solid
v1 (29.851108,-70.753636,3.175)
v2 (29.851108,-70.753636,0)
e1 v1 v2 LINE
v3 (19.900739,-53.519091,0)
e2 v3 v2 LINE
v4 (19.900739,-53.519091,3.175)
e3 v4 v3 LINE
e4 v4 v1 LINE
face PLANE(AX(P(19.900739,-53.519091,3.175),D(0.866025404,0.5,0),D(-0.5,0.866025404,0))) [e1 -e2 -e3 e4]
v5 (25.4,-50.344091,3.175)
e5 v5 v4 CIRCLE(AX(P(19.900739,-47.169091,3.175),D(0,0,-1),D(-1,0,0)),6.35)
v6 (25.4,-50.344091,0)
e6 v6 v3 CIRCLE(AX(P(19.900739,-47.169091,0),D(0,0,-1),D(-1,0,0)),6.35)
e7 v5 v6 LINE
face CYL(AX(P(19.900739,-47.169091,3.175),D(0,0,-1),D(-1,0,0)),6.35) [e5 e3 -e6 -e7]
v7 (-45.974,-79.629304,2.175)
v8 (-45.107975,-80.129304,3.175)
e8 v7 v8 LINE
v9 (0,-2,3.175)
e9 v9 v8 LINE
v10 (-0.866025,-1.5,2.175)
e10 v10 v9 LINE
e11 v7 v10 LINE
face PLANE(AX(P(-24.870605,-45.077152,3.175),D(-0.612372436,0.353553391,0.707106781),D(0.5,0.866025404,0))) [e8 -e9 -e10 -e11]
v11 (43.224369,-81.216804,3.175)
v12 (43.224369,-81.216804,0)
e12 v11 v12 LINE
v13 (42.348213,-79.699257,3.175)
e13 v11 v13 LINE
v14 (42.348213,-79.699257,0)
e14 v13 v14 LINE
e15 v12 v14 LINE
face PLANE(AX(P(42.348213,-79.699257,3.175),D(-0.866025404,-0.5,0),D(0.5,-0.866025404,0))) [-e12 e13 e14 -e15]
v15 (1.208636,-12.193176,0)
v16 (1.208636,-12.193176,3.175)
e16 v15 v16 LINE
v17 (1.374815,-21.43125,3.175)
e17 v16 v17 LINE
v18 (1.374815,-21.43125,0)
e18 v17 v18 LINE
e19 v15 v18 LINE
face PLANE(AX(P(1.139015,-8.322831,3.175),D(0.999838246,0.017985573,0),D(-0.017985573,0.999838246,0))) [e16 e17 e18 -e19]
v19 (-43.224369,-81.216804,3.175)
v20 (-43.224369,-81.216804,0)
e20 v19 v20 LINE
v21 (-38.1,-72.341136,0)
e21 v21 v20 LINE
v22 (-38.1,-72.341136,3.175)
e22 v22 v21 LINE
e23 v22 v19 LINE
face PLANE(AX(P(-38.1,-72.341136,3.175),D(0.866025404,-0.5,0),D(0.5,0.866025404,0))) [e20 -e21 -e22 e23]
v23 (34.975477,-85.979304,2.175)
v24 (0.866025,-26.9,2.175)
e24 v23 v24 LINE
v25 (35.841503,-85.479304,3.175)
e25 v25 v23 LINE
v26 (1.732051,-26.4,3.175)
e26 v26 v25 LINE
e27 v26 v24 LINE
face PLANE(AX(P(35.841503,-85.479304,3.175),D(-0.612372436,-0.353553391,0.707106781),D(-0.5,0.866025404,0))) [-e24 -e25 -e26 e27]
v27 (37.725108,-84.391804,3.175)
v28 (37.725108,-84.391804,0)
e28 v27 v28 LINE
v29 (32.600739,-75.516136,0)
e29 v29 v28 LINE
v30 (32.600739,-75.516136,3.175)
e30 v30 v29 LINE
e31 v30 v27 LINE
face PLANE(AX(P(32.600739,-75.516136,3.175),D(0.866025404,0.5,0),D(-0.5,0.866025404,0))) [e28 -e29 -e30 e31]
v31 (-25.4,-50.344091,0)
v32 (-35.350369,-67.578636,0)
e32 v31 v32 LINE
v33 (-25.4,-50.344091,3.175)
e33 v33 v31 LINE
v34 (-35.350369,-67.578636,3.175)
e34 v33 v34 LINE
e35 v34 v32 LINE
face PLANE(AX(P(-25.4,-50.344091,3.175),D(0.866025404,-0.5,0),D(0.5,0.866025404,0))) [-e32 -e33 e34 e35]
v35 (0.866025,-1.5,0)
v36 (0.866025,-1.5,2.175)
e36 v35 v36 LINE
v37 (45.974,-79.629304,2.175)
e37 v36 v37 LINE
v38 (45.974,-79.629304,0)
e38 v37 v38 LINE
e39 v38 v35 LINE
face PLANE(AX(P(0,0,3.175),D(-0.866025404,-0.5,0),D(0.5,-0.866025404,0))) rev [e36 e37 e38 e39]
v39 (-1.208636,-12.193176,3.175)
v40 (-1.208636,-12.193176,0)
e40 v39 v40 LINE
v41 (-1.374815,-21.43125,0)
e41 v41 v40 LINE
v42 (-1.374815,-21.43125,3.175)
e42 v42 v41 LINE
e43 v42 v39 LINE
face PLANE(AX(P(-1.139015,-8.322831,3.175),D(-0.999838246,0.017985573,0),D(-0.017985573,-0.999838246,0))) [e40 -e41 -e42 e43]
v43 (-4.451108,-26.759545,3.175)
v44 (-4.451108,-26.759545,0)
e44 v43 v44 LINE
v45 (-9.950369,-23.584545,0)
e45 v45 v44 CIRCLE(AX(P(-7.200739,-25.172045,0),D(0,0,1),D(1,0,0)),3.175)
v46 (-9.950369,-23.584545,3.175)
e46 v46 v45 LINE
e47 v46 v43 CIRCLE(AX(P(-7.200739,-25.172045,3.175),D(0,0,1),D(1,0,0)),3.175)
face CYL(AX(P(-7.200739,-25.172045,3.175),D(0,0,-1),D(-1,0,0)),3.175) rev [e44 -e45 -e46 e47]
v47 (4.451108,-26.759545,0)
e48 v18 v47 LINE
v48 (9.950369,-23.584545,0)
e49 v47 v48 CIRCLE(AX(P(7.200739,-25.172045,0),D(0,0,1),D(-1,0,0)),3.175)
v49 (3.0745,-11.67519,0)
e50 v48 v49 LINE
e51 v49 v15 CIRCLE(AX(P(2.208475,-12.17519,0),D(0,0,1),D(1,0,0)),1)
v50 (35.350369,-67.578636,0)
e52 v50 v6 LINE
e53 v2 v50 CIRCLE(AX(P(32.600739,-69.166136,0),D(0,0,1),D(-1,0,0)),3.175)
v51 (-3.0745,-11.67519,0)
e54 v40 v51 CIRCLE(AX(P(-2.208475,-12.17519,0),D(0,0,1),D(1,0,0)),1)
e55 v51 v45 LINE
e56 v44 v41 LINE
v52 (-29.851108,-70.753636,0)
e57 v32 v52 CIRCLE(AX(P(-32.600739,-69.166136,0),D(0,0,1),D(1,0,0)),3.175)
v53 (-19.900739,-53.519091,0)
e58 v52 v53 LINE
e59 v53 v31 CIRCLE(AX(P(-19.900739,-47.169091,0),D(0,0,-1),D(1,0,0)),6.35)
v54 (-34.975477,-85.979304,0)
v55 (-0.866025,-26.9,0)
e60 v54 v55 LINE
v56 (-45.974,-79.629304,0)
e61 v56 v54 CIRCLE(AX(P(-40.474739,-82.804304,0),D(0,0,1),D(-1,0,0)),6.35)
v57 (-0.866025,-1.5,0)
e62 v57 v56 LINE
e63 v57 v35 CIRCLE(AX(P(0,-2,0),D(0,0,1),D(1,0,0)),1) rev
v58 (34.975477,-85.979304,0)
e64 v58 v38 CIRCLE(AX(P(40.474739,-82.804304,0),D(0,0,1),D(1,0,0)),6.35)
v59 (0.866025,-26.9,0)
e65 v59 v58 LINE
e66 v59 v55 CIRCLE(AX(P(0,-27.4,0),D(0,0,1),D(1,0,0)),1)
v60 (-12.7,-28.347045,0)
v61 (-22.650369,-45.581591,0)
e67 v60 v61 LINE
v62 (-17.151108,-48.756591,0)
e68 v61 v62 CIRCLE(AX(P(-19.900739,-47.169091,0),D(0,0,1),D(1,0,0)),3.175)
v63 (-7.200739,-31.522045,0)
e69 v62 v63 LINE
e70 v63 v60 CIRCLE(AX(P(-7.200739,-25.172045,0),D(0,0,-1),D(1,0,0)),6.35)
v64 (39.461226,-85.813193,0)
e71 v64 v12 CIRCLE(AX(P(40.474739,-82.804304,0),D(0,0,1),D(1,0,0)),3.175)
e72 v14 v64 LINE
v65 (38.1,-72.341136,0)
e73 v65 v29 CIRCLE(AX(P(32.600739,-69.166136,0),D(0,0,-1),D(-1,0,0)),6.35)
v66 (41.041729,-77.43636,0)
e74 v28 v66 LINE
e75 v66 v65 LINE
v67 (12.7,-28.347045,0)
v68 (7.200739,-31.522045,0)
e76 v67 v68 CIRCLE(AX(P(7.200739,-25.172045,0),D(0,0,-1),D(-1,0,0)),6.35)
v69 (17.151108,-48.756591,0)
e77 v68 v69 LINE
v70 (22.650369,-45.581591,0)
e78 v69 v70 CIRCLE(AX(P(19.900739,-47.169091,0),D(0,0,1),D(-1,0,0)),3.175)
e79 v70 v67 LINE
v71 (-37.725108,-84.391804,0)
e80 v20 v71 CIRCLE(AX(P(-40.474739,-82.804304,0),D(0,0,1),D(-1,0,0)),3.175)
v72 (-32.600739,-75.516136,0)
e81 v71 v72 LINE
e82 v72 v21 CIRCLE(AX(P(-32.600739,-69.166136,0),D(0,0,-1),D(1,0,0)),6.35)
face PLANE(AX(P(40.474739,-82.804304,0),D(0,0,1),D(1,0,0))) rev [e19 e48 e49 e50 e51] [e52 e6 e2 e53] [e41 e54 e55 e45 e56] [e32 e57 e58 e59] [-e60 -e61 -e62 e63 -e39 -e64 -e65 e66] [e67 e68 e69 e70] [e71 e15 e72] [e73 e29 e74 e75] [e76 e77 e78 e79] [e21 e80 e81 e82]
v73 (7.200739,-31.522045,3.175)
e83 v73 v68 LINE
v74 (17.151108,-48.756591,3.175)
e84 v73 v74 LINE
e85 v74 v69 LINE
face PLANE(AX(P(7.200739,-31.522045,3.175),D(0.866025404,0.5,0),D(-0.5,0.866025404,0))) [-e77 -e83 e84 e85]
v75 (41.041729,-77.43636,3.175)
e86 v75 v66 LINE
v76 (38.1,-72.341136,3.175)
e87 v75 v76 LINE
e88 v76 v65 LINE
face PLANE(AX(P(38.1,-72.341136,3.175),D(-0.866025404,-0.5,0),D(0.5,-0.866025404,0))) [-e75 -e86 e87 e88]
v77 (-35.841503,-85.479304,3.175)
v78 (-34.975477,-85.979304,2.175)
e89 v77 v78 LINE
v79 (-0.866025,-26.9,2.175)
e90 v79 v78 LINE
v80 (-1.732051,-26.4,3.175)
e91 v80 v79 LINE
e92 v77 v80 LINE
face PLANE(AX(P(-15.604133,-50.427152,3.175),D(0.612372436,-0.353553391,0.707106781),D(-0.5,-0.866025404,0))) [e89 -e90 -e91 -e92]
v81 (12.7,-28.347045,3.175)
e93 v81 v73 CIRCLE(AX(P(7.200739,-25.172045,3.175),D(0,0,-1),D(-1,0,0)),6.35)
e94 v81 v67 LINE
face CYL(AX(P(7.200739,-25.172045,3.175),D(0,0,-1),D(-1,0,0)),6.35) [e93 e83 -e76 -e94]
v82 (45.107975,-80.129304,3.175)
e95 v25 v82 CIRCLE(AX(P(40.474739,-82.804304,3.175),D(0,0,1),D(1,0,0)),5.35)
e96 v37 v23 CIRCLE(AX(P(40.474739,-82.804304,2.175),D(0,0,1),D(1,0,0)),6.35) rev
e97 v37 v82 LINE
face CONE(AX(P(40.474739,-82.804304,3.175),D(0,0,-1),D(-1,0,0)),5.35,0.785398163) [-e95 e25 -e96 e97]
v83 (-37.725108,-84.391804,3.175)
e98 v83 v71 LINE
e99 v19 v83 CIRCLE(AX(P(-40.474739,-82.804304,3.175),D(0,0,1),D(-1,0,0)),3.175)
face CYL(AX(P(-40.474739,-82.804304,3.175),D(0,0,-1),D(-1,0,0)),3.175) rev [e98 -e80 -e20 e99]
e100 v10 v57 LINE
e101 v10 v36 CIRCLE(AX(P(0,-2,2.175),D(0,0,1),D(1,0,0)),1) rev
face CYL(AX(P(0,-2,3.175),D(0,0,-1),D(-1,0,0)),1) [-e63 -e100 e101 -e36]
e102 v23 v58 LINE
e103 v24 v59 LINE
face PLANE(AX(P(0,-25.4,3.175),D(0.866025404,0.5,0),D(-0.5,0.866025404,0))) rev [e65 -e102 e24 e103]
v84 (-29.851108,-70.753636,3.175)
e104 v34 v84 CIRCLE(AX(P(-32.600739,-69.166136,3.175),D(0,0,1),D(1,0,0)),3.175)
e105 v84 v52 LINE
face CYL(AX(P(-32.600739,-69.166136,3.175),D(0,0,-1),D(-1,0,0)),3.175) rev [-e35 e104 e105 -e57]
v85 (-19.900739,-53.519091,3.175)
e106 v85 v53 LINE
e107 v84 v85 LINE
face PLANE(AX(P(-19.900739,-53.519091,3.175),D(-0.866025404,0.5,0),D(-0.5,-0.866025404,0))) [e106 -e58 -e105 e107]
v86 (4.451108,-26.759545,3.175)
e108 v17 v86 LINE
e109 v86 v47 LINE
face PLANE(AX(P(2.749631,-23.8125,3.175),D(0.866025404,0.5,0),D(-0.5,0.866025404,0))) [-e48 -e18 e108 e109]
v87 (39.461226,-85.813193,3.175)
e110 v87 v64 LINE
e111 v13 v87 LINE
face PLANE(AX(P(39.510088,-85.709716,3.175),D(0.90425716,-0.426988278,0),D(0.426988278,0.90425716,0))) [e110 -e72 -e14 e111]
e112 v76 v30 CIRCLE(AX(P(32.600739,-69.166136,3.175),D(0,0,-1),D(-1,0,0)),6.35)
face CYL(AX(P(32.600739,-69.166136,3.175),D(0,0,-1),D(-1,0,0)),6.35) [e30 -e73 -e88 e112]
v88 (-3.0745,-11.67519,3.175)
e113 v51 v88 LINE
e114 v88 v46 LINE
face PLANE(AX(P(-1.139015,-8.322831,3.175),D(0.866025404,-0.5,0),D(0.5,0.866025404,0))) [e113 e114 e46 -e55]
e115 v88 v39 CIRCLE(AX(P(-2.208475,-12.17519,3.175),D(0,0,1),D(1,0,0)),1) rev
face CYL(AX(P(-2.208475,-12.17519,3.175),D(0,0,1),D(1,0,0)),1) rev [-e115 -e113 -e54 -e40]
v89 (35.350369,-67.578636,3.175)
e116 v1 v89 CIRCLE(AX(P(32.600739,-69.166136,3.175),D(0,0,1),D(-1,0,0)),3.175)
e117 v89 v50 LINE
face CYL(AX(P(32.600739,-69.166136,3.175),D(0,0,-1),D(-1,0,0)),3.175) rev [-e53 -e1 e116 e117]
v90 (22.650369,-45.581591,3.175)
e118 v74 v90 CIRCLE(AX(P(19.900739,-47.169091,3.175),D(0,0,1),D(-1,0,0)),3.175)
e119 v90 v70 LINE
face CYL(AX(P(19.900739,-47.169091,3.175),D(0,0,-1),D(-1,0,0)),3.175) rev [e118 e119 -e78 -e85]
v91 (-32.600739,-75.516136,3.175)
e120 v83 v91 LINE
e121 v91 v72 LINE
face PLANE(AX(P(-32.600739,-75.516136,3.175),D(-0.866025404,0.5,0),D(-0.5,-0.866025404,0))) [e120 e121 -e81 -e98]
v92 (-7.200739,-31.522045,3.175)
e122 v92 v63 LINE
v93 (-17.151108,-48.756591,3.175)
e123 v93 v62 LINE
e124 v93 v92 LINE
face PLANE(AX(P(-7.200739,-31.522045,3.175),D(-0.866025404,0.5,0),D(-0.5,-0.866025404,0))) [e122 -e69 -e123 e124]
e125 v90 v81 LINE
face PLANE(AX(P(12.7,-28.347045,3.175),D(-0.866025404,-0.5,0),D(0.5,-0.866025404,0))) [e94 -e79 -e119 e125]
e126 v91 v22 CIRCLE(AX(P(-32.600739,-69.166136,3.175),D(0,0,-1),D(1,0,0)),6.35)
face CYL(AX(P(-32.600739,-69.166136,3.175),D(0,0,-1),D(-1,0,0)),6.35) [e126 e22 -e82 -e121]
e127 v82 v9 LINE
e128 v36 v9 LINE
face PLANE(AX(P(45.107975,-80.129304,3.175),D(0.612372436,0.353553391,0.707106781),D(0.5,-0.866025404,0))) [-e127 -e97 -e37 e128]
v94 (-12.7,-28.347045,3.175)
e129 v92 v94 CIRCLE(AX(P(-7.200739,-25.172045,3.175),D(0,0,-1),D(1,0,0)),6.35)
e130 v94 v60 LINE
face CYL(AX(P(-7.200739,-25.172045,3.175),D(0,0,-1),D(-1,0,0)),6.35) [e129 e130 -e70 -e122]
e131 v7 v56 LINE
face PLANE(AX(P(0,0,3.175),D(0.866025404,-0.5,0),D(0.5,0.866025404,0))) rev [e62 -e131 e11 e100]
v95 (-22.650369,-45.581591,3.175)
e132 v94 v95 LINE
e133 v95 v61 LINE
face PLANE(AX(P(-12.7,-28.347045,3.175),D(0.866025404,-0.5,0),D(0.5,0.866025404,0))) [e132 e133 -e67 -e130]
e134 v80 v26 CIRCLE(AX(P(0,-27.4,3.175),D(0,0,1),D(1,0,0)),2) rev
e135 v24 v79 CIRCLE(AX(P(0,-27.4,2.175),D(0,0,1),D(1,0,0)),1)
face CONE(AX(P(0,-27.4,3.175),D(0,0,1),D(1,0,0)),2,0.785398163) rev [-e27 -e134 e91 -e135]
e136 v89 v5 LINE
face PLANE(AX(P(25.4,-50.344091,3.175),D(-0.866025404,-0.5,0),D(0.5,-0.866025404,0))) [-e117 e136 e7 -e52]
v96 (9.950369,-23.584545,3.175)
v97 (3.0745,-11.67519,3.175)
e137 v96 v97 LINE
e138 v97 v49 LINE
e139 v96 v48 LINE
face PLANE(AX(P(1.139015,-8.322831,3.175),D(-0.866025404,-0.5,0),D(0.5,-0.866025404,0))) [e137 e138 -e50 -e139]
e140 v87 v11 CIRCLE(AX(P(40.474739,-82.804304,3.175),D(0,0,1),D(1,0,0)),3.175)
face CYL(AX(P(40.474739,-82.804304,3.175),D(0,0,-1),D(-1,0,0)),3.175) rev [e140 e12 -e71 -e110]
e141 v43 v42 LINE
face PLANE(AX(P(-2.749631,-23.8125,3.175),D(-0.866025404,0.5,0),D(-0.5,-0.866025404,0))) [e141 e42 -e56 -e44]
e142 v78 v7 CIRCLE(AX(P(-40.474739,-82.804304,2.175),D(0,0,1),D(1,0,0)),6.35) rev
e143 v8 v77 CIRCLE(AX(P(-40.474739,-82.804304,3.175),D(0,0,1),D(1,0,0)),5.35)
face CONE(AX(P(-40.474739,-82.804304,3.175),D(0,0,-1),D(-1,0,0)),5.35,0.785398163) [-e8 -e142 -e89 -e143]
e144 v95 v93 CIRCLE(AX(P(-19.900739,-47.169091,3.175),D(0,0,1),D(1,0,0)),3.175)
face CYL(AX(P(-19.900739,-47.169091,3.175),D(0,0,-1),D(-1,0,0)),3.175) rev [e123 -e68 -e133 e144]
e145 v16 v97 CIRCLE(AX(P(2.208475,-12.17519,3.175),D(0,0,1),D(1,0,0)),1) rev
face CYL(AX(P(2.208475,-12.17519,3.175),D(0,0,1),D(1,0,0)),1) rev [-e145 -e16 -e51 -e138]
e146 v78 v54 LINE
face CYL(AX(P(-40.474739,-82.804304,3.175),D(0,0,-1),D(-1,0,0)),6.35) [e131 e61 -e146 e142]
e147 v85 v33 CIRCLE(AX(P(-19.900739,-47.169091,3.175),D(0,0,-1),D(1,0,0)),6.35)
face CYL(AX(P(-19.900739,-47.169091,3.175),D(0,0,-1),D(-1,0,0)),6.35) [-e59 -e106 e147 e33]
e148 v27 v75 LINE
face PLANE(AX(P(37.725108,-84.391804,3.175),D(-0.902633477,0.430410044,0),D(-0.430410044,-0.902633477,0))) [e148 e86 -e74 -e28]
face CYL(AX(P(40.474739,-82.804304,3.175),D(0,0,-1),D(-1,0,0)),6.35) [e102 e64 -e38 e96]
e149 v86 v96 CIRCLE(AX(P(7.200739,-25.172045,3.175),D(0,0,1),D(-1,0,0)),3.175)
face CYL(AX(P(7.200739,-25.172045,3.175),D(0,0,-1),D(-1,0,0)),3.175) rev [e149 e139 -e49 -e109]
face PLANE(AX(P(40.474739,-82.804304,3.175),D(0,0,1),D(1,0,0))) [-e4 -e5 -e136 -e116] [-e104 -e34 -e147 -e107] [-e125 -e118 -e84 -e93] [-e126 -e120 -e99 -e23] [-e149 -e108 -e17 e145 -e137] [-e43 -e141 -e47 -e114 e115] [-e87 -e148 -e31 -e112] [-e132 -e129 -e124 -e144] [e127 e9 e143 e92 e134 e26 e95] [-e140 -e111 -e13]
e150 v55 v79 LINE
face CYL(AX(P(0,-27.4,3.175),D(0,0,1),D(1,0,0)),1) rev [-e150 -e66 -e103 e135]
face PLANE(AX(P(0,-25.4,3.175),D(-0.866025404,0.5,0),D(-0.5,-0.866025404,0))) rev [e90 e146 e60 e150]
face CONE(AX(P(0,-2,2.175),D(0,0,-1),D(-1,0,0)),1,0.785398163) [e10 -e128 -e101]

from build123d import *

# Parameters (mm, degrees)
BOSS_EXTRUDE1_DEPTH = 3.175
FILLET1_R           = 1
FILLET2_R           = 1
CHAMFER1_SIZE       = 1


with BuildPart() as part:
    # Sketch1 → Boss-Extrude1 (new body)
    with BuildSketch(Plane.XY):
        with BuildLine():
            Line((0, 0), (-45.974, -79.629303827))
            ThreePointArc((-45.974, -79.629303827), (-43.649738686, -88.303565141), (-34.975477372, -85.979303827))
            Line((-34.975477372, -85.979303827), (0, -25.4))
            Line((0, -25.4), (34.975477372, -85.979303827))
            ThreePointArc((34.975477372, -85.979303827), (43.649738686, -88.303565141), (45.974, -79.629303827))
            Line((45.974, -79.629303827), (0, 0))
        make_face()
        with BuildLine():
            Line((-1.139014765, -8.322831444), (-9.950369343, -23.584545256))
            ThreePointArc((-9.950369343, -23.584545256), (-8.788238686, -27.921675913), (-4.451108029, -26.759545256))
            Line((-4.451108029, -26.759545256), (-2.749630657, -23.8125))
            Line((-2.749630657, -23.8125), (-1.374815329, -21.43125))
            Line((-1.374815329, -21.43125), (-1.139014765, -8.322831444))
        make_face(mode=Mode.SUBTRACT)
        with BuildLine():
            Line((-38.1, -72.341135768), (-43.224369343, -81.216803827))
            ThreePointArc((-43.224369343, -81.216803827), (-42.062238686, -85.553934484), (-37.725108029, -84.391803827))
            Line((-37.725108029, -84.391803827), (-32.600738686, -75.516135768))
            ThreePointArc((-32.600738686, -75.516135768), (-35.775738686, -74.665397082), (-38.1, -72.341135768))
        make_face(mode=Mode.SUBTRACT)
        with BuildLine():
            Line((-19.900738686, -53.519090512), (-29.851108029, -70.753635768))
            ThreePointArc((-29.851108029, -70.753635768), (-34.188238686, -71.915766425), (-35.350369343, -67.578635768))
            Line((-35.350369343, -67.578635768), (-25.4, -50.344090512))
            ThreePointArc((-25.4, -50.344090512), (-23.075738686, -52.668351826), (-19.900738686, -53.519090512))
        make_face(mode=Mode.SUBTRACT)
        with BuildLine():
            Line((-7.200738686, -31.522045256), (-17.151108029, -48.756590512))
            ThreePointArc((-17.151108029, -48.756590512), (-21.488238686, -49.918721169), (-22.650369343, -45.581590512))
            Line((-22.650369343, -45.581590512), (-12.7, -28.347045256))
            ThreePointArc((-12.7, -28.347045256), (-10.375738686, -30.67130657), (-7.200738686, -31.522045256))
        make_face(mode=Mode.SUBTRACT)
        with BuildLine():
            Line((2.749630657, -23.8125), (1.374815329, -21.43125))
            Line((1.374815329, -21.43125), (1.139014765, -8.322831444))
            Line((1.139014765, -8.322831444), (9.950369343, -23.584545256))
            ThreePointArc((9.950369343, -23.584545256), (8.788238686, -27.921675913), (4.451108029, -26.759545256))
            Line((4.451108029, -26.759545256), (2.749630657, -23.8125))
        make_face(mode=Mode.SUBTRACT)
        with BuildLine():
            Line((12.7, -28.347045256), (22.650369343, -45.581590512))
            ThreePointArc((22.650369343, -45.581590512), (21.488238686, -49.918721169), (17.151108029, -48.756590512))
            Line((17.151108029, -48.756590512), (7.200738686, -31.522045256))
            ThreePointArc((7.200738686, -31.522045256), (10.375738686, -30.67130657), (12.7, -28.347045256))
        make_face(mode=Mode.SUBTRACT)
        with BuildLine():
            Line((25.4, -50.344090512), (35.350369343, -67.578635768))
            ThreePointArc((35.350369343, -67.578635768), (34.188238686, -71.915766425), (29.851108029, -70.753635768))
            Line((29.851108029, -70.753635768), (19.900738686, -53.519090512))
            ThreePointArc((19.900738686, -53.519090512), (23.075738686, -52.668351826), (25.4, -50.344090512))
        make_face(mode=Mode.SUBTRACT)
        with BuildLine():
            Line((32.600738686, -75.516135768), (37.725108029, -84.391803827))
            Line((37.725108029, -84.391803827), (41.041728895, -77.436359677))
            Line((41.041728895, -77.436359677), (38.1, -72.341135768))
            ThreePointArc((38.1, -72.341135768), (35.775738686, -74.665397082), (32.600738686, -75.516135768))
        make_face(mode=Mode.SUBTRACT)
        with BuildLine():
            Line((39.510088039, -85.709715542), (42.266670891, -79.871944556))
            Line((42.266670891, -79.871944556), (42.348213443, -79.699257294))
            Line((42.348213443, -79.699257294), (43.224369343, -81.216803827))
            ThreePointArc((43.224369343, -81.216803827), (42.931408354, -84.815621589), (39.461225977, -85.813193487))
            Line((39.461225977, -85.813193487), (39.510088039, -85.709715542))
        make_face(mode=Mode.SUBTRACT)
    extrude(amount=BOSS_EXTRUDE1_DEPTH)

    # Fillet1
    fillet1_edges = [part.edges().sort_by_distance(p)[0] for p in [
        (0, 0, 1.5875),
        (-1.139014765, -8.322831444, 1.5875),
        (1.139014765, -8.322831444, 1.5875),
    ]]
    fillet(fillet1_edges, radius=FILLET1_R)

    # Fillet2
    fillet2_edges = [part.edges().sort_by_distance(p)[0] for p in [
        (0, -25.4, 1.5875),
    ]]
    fillet(fillet2_edges, radius=FILLET2_R)

    # Chamfer1
    chamfer1_edges = [part.edges().sort_by_distance(p)[0] for p in [
        (-43.649738686, -88.303565141, 3.175),
        (-17.920751388, -56.439651914, 3.175),
        (-23.420012702, -40.564651914, 3.175),
        (0, -1, 3.175),
        (17.920751388, -56.439651914, 3.175),
        (0, -26.4, 3.175),
        (43.649738686, -88.303565141, 3.175),
        (23.420012702, -40.564651914, 3.175),
    ]]
    chamfer(chamfer1_edges, length=CHAMFER1_SIZE - 0.0001)  # a hair under: the kernel refuses the full size


solid = part.part
